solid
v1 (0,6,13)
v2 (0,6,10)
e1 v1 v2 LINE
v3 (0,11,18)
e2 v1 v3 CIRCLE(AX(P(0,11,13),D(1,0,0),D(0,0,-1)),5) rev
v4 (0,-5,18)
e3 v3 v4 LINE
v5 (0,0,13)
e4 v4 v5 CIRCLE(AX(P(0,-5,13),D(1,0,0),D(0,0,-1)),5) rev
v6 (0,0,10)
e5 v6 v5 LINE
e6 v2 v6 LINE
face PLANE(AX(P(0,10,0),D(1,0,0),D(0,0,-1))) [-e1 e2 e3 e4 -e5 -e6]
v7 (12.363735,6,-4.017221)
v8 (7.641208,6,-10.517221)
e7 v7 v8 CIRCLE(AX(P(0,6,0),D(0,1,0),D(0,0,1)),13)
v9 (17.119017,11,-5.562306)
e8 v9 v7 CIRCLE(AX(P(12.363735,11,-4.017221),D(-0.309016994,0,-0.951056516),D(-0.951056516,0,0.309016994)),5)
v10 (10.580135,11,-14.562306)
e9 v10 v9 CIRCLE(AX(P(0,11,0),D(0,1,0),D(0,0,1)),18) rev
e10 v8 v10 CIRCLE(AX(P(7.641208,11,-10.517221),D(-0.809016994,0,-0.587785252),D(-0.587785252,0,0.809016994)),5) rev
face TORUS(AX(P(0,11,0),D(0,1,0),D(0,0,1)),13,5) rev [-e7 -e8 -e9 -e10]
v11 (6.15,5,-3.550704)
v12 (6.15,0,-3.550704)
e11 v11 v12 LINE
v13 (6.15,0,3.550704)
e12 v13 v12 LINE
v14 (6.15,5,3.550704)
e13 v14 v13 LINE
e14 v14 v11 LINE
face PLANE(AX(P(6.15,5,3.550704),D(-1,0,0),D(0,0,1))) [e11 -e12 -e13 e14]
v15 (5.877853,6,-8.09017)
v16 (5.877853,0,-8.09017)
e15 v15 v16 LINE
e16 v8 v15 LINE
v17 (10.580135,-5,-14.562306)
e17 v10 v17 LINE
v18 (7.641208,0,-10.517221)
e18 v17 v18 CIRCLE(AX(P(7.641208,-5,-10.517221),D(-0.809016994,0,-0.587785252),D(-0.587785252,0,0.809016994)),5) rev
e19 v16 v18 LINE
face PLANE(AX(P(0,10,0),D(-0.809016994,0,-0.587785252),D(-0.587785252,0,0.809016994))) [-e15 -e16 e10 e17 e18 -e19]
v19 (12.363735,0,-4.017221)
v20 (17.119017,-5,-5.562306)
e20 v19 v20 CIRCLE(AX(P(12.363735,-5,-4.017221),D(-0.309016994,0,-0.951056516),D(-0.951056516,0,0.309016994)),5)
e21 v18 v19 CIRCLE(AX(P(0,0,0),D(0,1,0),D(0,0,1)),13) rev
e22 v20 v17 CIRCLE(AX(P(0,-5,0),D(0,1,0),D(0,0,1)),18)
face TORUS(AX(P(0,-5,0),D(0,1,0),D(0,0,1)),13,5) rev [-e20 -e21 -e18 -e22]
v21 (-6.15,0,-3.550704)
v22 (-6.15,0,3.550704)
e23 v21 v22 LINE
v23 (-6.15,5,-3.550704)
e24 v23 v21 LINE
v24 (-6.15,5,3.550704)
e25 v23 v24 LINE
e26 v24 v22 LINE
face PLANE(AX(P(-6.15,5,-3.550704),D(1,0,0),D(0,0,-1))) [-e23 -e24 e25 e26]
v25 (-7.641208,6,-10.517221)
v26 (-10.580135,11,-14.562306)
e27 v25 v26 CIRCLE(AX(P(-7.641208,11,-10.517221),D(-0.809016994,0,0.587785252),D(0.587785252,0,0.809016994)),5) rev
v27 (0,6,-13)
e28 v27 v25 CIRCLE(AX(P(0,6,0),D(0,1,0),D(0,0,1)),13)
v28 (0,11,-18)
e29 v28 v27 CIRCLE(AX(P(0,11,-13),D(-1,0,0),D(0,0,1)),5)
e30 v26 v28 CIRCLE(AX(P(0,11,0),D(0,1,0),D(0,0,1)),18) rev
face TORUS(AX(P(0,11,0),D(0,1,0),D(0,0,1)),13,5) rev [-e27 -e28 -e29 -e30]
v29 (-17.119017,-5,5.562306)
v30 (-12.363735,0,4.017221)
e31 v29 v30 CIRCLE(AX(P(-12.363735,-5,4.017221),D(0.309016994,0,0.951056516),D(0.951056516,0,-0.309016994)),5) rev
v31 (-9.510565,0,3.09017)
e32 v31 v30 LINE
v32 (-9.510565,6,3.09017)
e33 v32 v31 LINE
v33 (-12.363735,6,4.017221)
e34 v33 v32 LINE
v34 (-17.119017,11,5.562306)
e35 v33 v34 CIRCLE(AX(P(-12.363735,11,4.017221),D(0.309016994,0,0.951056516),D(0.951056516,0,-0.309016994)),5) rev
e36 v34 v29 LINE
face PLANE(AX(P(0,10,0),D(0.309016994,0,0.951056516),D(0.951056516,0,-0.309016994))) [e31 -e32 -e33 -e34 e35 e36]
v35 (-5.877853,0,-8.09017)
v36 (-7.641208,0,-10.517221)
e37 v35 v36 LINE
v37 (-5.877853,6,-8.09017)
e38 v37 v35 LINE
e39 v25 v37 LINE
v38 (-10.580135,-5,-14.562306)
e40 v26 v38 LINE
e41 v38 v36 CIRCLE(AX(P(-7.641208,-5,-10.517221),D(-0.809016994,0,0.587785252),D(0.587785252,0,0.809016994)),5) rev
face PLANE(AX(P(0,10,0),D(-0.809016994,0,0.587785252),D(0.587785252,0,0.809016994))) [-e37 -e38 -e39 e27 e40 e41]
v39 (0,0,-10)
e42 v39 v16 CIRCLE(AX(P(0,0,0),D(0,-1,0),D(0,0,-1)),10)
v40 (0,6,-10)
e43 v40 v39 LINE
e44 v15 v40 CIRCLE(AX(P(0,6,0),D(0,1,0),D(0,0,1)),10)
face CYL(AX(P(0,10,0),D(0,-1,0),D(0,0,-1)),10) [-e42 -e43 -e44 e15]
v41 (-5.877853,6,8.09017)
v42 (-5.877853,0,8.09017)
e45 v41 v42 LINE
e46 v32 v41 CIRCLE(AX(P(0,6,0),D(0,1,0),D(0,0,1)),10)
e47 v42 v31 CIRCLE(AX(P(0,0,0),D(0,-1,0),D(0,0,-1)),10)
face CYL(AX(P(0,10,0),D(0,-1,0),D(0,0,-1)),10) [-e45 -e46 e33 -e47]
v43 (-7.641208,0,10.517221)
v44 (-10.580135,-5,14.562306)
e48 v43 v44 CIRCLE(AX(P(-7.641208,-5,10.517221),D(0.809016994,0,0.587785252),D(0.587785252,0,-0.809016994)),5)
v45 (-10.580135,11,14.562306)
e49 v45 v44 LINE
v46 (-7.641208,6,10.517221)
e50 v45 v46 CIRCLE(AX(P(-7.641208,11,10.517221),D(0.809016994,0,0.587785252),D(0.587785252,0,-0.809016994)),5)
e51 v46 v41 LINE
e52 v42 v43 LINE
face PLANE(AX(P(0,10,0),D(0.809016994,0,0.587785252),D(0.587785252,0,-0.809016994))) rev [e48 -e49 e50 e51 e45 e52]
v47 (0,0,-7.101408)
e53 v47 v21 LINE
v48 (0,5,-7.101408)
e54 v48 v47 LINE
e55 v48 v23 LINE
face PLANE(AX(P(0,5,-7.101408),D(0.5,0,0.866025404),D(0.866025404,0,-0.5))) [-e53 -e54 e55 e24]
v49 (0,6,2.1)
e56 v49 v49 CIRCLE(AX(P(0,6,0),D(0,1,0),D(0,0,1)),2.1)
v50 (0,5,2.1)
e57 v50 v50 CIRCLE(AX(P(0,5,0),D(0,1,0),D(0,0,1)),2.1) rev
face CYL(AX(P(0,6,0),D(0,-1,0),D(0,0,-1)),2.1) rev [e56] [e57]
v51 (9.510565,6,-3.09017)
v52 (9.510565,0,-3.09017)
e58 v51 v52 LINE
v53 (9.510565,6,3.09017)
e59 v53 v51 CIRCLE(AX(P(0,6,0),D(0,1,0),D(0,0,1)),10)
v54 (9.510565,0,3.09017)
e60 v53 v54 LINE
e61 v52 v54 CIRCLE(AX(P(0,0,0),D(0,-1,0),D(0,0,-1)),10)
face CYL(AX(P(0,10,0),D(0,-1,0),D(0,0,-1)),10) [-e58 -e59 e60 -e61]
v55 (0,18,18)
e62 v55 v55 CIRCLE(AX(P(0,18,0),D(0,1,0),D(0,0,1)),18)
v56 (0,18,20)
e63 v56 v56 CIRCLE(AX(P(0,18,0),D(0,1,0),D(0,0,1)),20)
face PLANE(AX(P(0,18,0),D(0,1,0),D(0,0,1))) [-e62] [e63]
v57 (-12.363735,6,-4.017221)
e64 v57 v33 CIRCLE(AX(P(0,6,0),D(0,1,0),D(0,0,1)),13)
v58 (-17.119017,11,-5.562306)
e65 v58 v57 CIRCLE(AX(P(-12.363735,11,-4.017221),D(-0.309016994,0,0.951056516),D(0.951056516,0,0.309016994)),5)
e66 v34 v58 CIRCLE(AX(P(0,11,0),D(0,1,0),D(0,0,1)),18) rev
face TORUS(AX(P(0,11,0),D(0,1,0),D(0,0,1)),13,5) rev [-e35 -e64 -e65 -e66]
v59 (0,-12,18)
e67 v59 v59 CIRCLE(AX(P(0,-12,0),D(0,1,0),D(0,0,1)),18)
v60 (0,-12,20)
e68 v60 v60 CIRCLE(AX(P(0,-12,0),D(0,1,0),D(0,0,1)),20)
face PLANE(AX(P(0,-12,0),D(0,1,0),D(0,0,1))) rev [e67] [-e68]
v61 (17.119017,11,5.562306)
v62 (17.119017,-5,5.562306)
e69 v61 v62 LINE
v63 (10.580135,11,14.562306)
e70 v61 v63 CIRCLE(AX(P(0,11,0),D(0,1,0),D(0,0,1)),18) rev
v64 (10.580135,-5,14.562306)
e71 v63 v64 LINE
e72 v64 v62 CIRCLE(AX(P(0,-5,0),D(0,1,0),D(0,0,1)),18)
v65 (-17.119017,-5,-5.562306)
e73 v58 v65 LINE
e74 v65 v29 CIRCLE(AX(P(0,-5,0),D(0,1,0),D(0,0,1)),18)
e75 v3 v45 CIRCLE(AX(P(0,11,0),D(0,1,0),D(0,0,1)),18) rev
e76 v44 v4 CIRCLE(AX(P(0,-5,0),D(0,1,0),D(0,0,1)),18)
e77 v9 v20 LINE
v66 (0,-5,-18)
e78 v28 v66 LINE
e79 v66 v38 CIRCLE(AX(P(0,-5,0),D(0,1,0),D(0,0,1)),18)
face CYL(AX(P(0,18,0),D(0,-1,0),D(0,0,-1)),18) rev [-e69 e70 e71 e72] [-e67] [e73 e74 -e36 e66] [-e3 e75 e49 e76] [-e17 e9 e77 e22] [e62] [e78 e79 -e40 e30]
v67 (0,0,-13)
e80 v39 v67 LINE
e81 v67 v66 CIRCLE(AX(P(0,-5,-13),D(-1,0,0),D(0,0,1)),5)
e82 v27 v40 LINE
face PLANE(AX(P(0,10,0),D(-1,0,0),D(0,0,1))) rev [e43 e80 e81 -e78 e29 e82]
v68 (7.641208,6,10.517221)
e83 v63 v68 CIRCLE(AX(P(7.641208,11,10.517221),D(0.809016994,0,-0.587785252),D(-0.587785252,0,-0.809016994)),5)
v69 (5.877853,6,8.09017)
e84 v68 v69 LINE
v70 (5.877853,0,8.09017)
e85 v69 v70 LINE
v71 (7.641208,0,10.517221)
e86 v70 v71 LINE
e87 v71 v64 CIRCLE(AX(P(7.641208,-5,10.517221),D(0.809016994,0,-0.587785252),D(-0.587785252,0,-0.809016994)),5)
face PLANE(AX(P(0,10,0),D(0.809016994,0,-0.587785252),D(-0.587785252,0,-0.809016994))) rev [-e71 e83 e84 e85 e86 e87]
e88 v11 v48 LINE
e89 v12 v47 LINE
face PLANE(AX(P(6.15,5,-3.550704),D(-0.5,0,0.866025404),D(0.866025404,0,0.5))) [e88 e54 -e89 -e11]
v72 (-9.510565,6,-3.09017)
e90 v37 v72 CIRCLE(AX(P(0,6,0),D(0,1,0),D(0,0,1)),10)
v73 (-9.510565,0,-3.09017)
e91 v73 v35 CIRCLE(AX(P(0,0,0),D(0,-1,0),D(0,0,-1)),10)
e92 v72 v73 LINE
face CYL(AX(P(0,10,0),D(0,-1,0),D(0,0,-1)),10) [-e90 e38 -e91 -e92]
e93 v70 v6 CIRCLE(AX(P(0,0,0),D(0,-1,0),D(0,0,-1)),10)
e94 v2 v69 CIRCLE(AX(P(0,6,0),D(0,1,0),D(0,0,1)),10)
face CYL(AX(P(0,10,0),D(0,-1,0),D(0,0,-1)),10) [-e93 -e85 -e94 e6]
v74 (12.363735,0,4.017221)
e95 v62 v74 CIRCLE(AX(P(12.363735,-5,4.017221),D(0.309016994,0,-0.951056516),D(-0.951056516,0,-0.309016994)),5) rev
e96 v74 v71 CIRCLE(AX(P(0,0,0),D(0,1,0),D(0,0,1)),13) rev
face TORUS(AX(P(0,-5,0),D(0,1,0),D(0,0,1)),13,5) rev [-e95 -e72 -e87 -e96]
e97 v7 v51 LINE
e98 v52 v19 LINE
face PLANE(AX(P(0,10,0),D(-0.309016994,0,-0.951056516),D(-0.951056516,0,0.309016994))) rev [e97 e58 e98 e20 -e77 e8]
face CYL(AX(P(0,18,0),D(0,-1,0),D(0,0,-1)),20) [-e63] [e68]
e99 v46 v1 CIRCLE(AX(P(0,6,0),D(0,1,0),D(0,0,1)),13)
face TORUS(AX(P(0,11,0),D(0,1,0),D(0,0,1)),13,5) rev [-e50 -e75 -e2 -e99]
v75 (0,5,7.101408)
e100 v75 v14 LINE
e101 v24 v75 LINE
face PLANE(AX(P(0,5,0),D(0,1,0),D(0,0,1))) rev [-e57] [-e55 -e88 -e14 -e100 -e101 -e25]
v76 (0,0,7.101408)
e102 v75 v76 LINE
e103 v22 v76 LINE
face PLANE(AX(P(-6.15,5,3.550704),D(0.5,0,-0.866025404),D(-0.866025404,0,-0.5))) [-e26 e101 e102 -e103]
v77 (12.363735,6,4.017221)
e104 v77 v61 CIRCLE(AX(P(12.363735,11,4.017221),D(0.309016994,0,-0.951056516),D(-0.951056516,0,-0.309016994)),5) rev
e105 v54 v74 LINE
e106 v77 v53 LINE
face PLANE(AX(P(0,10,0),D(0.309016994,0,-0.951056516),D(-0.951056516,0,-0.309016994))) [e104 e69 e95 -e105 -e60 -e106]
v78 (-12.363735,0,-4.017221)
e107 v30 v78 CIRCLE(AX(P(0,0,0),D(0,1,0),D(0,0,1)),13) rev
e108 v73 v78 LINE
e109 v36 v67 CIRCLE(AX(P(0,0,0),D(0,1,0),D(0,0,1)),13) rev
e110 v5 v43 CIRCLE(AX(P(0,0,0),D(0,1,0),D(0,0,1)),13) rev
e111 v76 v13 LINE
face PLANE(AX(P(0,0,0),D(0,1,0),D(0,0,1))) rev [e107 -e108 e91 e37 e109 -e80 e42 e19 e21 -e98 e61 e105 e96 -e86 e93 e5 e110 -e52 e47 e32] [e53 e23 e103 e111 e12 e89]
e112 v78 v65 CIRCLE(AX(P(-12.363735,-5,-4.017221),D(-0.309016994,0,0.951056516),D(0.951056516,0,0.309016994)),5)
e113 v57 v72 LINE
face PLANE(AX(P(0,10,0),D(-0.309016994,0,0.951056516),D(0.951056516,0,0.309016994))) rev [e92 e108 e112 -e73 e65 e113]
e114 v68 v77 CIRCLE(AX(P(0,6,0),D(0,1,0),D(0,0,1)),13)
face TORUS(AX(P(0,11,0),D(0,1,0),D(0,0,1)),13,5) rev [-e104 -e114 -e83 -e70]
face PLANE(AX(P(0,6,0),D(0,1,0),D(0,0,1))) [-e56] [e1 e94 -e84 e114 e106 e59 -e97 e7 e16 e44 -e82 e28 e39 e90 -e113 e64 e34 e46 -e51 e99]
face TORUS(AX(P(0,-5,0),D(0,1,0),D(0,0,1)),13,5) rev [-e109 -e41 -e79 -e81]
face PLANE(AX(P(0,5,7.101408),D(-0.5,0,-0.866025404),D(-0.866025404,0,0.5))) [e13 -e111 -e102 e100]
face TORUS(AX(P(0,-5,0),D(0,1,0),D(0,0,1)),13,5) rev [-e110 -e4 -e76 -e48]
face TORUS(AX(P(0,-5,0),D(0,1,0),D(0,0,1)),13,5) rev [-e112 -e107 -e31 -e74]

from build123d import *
from build123d.topology import SkipClean

# Parameters (mm, degrees)
SKETCH1_R           = 18
BOSS_EXTRUDE1_DEPTH = 6
CUT_EXTRUDE1_DEPTH  = 5
SKETCH1_28_R        = 2.1
CUT_EXTRUDE2_DEPTH  = 27.153393661
SKETCH1_29_R        = 20
SKETCH1_29_R_2      = 18
BOSS_EXTRUDE2_DEPTH = 18
CUT_EXTRUDE3_DEPTH  = 10
BOSS_EXTRUDE3_START = -12
SKETCH1_30_R        = 20
SKETCH1_30_R_2      = 18
BOSS_EXTRUDE3_DEPTH = 12
FILLET1_ANGLE       = 36
FILLET1_2_ANGLE     = 36
FILLET1_3_ANGLE     = 36
FILLET1_4_ANGLE     = 36
FILLET1_5_ANGLE     = 36


with BuildPart() as part:
    # Sketch1 → Boss-Extrude1 (new body)
    with BuildSketch(Plane(origin=(0, 0, 0), x_dir=(1, 0, 0), z_dir=(0, 1, 0))):
        with Locations(Location((0, 0, 0), (0, 0, 270))):
            Circle(SKETCH1_R)
    extrude(amount=BOSS_EXTRUDE1_DEPTH)

    # Sketch1<27> → Cut-Extrude1 (cut)
    with BuildSketch(Plane(origin=(0, 0, 0), x_dir=(1, 0, 0), z_dir=(0, 1, 0))):
        Polygon((0, -7.101408311), (6.15, -3.550704156), (6.15, 3.550704156), (0, 7.101408311), (-6.15, 3.550704156), (-6.15, -3.550704156), align=None)
    extrude(amount=CUT_EXTRUDE1_DEPTH, mode=Mode.SUBTRACT)

    # Sketch1<28> → Cut-Extrude2 (cut, through all)
    with BuildSketch(Plane(origin=(0, 0, 0), x_dir=(1, 0, 0), z_dir=(0, 1, 0))):
        with Locations(Location((0, 0, 0), (0, 0, 270))):
            Circle(SKETCH1_28_R)
    extrude(amount=CUT_EXTRUDE2_DEPTH, mode=Mode.SUBTRACT)

    # Sketch1<29> → Boss-Extrude2 (add)
    with BuildSketch(Plane(origin=(0, 0, 0), x_dir=(1, 0, 0), z_dir=(0, 1, 0))):
        with Locations(Location((0, 0, 0), (0, 0, 270))):
            Circle(SKETCH1_29_R)
        with Locations(Location((0, 0, 0), (0, 0, 270))):
            Circle(SKETCH1_29_R_2, mode=Mode.SUBTRACT)
    extrude(amount=BOSS_EXTRUDE2_DEPTH)

    # Sketch2 → Cut-Extrude3 (cut)
    with SkipClean():  # the faces are left unmerged after this step: merging them gives an invalid solid
        with BuildSketch(Plane.XZ):
            with BuildLine():
                ThreePointArc((5.877852523, -8.090169944), (3.090169944, -9.510565163), (0, -10))
                Line((0, -10), (0, -18))
                ThreePointArc((0, -18), (5.562305899, -17.119017293), (10.580134541, -14.562305899))
                Line((10.580134541, -14.562305899), (5.877852523, -8.090169944))
            make_face()
            with BuildLine():
                Line((-10.580134541, -14.562305899), (-5.877852523, -8.090169944))
                ThreePointArc((-5.877852523, -8.090169944), (-8.090169944, -5.877852523), (-9.510565163, -3.090169944))
                Line((-9.510565163, -3.090169944), (-17.119017293, -5.562305899))
                ThreePointArc((-17.119017293, -5.562305899), (-14.562305899, -10.580134541), (-10.580134541, -14.562305899))
            make_face()
            with BuildLine():
                Line((-17.119017293, 5.562305899), (-9.510565163, 3.090169944))
                ThreePointArc((-9.510565163, 3.090169944), (-8.090169944, 5.877852523), (-5.877852523, 8.090169944))
                Line((-5.877852523, 8.090169944), (-10.580134541, 14.562305899))
                ThreePointArc((-10.580134541, 14.562305899), (-14.562305899, 10.580134541), (-17.119017293, 5.562305899))
            make_face()
            with BuildLine():
                Line((0, 18), (0, 10))
                ThreePointArc((0, 10), (3.090169944, 9.510565163), (5.877852523, 8.090169944))
                Line((5.877852523, 8.090169944), (10.580134541, 14.562305899))
                ThreePointArc((10.580134541, 14.562305899), (5.562305899, 17.119017293), (0, 18))
            make_face()
            with BuildLine():
                ThreePointArc((10, 0), (9.876883406, -1.56434465), (9.510565163, -3.090169944))
                Line((9.510565163, -3.090169944), (17.119017293, -5.562305899))
                ThreePointArc((17.119017293, -5.562305899), (17.778390131, -2.815820371), (18, 0))
                ThreePointArc((18, 0), (17.778390131, 2.815820371), (17.119017293, 5.562305899))
                Line((17.119017293, 5.562305899), (9.510565163, 3.090169944))
                ThreePointArc((9.510565163, 3.090169944), (9.876883406, 1.56434465), (10, 0))
            make_face()
        extrude(amount=-CUT_EXTRUDE3_DEPTH, mode=Mode.SUBTRACT)
    add(part.part.scale(1), mode=Mode.REPLACE)  # the faces are merged on a copy

    # Sketch1<30> → Boss-Extrude3 (add)
    with SkipClean():  # the faces are left unmerged after this step: merging them gives an invalid solid
        with BuildSketch(Plane(origin=(0, 0, 0), x_dir=(1, 0, 0), z_dir=(0, 1, 0)).offset(BOSS_EXTRUDE3_START)):
            with Locations(Location((0, 0, 0), (0, 0, 270))):
                Circle(SKETCH1_30_R)
            with Locations(Location((0, 0, 0), (0, 0, 270))):
                Circle(SKETCH1_30_R_2, mode=Mode.SUBTRACT)
        extrude(amount=BOSS_EXTRUDE3_DEPTH)

    # Fillet1: read off the stored shape, not the designer's step
    # Fillet1 outline → Fillet1 (revolve)
    with SkipClean():  # the faces are left unmerged after this step: merging them gives an invalid solid
        with BuildSketch(Plane(origin=(0, 0, 0), x_dir=(-0.9510565162951906, 0, -0.3090169943748335), z_dir=(0.3090169943748335, 0, -0.9510565162951906))):
            with BuildLine():
                ThreePointArc((18, 11), (16.535533906, 7.464466094), (13, 6))
                Line((13, 6), (18, 6))
                Line((18, 6), (18, 11))
            make_face()
            with BuildLine():
                Line((18, 0), (13, 0))
                ThreePointArc((13, 0), (16.535533906, -1.464466094), (18, -5))
                Line((18, -5), (18, 0))
            make_face()
        revolve(axis=Axis((0, 0, 0), (0, 1, 0)), revolution_arc=FILLET1_ANGLE)

    # Fillet1 2 outline → Fillet1 2 (revolve)
    with SkipClean():  # the faces are left unmerged after this step: merging them gives an invalid solid
        with BuildSketch(Plane(origin=(0, 0, 0), x_dir=(-0.5877852522922776, 0, 0.8090169943750894), z_dir=(-0.8090169943750894, 0, -0.5877852522922776))):
            with BuildLine():
                ThreePointArc((18, 11), (16.535533906, 7.464466094), (13, 6))
                Line((13, 6), (18, 6))
                Line((18, 6), (18, 11))
            make_face()
            with BuildLine():
                Line((18, 0), (13, 0))
                ThreePointArc((13, 0), (16.535533906, -1.464466094), (18, -5))
                Line((18, -5), (18, 0))
            make_face()
        revolve(axis=Axis((0, 0, 0), (0, 1, 0)), revolution_arc=FILLET1_2_ANGLE)

    # Fillet1 3 outline → Fillet1 3 (revolve)
    with SkipClean():  # the faces are left unmerged after this step: merging them gives an invalid solid
        with BuildSketch(Plane(origin=(0, 0, 0), x_dir=(0.5877852522925205, 0, 0.809016994374913), z_dir=(-0.809016994374913, 0, 0.5877852522925205))):
            with BuildLine():
                ThreePointArc((18, 11), (16.535533906, 7.464466094), (13, 6))
                Line((13, 6), (18, 6))
                Line((18, 6), (18, 11))
            make_face()
            with BuildLine():
                Line((18, 0), (13, 0))
                ThreePointArc((13, 0), (16.535533906, -1.464466094), (18, -5))
                Line((18, -5), (18, 0))
            make_face()
        revolve(axis=Axis((0, 0, 0), (0, 1, 0)), revolution_arc=FILLET1_3_ANGLE)

    # Fillet1 4 outline → Fillet1 4 (revolve)
    with SkipClean():  # the faces are left unmerged after this step: merging them gives an invalid solid
        with BuildSketch(Plane(origin=(0, 0, 0), x_dir=(0, 0, -1), z_dir=(1, 0, 0))):
            with BuildLine():
                ThreePointArc((18, 11), (16.535533906, 7.464466094), (13, 6))
                Line((13, 6), (18, 6))
                Line((18, 6), (18, 11))
            make_face()
            with BuildLine():
                Line((18, 0), (13, 0))
                ThreePointArc((13, 0), (16.535533906, -1.464466094), (18, -5))
                Line((18, -5), (18, 0))
            make_face()
        revolve(axis=Axis((0, 0, 0), (0, 1, 0)), revolution_arc=FILLET1_4_ANGLE)

    # Fillet1 5 outline → Fillet1 5 (revolve)
    with SkipClean():  # the faces are left unmerged after this step: merging them gives an invalid solid
        with BuildSketch(Plane(origin=(0, 0, 0), x_dir=(0.9510565162951443, 0, -0.3090169943749758), z_dir=(0.3090169943749758, 0, 0.9510565162951443))):
            with BuildLine():
                ThreePointArc((18, 11), (16.535533906, 7.464466094), (13, 6))
                Line((13, 6), (18, 6))
                Line((18, 6), (18, 11))
            make_face()
            with BuildLine():
                Line((18, 0), (13, 0))
                ThreePointArc((13, 0), (16.535533906, -1.464466094), (18, -5))
                Line((18, -5), (18, 0))
            make_face()
        revolve(axis=Axis((0, 0, 0), (0, 1, 0)), revolution_arc=FILLET1_5_ANGLE)


solid = part.part
